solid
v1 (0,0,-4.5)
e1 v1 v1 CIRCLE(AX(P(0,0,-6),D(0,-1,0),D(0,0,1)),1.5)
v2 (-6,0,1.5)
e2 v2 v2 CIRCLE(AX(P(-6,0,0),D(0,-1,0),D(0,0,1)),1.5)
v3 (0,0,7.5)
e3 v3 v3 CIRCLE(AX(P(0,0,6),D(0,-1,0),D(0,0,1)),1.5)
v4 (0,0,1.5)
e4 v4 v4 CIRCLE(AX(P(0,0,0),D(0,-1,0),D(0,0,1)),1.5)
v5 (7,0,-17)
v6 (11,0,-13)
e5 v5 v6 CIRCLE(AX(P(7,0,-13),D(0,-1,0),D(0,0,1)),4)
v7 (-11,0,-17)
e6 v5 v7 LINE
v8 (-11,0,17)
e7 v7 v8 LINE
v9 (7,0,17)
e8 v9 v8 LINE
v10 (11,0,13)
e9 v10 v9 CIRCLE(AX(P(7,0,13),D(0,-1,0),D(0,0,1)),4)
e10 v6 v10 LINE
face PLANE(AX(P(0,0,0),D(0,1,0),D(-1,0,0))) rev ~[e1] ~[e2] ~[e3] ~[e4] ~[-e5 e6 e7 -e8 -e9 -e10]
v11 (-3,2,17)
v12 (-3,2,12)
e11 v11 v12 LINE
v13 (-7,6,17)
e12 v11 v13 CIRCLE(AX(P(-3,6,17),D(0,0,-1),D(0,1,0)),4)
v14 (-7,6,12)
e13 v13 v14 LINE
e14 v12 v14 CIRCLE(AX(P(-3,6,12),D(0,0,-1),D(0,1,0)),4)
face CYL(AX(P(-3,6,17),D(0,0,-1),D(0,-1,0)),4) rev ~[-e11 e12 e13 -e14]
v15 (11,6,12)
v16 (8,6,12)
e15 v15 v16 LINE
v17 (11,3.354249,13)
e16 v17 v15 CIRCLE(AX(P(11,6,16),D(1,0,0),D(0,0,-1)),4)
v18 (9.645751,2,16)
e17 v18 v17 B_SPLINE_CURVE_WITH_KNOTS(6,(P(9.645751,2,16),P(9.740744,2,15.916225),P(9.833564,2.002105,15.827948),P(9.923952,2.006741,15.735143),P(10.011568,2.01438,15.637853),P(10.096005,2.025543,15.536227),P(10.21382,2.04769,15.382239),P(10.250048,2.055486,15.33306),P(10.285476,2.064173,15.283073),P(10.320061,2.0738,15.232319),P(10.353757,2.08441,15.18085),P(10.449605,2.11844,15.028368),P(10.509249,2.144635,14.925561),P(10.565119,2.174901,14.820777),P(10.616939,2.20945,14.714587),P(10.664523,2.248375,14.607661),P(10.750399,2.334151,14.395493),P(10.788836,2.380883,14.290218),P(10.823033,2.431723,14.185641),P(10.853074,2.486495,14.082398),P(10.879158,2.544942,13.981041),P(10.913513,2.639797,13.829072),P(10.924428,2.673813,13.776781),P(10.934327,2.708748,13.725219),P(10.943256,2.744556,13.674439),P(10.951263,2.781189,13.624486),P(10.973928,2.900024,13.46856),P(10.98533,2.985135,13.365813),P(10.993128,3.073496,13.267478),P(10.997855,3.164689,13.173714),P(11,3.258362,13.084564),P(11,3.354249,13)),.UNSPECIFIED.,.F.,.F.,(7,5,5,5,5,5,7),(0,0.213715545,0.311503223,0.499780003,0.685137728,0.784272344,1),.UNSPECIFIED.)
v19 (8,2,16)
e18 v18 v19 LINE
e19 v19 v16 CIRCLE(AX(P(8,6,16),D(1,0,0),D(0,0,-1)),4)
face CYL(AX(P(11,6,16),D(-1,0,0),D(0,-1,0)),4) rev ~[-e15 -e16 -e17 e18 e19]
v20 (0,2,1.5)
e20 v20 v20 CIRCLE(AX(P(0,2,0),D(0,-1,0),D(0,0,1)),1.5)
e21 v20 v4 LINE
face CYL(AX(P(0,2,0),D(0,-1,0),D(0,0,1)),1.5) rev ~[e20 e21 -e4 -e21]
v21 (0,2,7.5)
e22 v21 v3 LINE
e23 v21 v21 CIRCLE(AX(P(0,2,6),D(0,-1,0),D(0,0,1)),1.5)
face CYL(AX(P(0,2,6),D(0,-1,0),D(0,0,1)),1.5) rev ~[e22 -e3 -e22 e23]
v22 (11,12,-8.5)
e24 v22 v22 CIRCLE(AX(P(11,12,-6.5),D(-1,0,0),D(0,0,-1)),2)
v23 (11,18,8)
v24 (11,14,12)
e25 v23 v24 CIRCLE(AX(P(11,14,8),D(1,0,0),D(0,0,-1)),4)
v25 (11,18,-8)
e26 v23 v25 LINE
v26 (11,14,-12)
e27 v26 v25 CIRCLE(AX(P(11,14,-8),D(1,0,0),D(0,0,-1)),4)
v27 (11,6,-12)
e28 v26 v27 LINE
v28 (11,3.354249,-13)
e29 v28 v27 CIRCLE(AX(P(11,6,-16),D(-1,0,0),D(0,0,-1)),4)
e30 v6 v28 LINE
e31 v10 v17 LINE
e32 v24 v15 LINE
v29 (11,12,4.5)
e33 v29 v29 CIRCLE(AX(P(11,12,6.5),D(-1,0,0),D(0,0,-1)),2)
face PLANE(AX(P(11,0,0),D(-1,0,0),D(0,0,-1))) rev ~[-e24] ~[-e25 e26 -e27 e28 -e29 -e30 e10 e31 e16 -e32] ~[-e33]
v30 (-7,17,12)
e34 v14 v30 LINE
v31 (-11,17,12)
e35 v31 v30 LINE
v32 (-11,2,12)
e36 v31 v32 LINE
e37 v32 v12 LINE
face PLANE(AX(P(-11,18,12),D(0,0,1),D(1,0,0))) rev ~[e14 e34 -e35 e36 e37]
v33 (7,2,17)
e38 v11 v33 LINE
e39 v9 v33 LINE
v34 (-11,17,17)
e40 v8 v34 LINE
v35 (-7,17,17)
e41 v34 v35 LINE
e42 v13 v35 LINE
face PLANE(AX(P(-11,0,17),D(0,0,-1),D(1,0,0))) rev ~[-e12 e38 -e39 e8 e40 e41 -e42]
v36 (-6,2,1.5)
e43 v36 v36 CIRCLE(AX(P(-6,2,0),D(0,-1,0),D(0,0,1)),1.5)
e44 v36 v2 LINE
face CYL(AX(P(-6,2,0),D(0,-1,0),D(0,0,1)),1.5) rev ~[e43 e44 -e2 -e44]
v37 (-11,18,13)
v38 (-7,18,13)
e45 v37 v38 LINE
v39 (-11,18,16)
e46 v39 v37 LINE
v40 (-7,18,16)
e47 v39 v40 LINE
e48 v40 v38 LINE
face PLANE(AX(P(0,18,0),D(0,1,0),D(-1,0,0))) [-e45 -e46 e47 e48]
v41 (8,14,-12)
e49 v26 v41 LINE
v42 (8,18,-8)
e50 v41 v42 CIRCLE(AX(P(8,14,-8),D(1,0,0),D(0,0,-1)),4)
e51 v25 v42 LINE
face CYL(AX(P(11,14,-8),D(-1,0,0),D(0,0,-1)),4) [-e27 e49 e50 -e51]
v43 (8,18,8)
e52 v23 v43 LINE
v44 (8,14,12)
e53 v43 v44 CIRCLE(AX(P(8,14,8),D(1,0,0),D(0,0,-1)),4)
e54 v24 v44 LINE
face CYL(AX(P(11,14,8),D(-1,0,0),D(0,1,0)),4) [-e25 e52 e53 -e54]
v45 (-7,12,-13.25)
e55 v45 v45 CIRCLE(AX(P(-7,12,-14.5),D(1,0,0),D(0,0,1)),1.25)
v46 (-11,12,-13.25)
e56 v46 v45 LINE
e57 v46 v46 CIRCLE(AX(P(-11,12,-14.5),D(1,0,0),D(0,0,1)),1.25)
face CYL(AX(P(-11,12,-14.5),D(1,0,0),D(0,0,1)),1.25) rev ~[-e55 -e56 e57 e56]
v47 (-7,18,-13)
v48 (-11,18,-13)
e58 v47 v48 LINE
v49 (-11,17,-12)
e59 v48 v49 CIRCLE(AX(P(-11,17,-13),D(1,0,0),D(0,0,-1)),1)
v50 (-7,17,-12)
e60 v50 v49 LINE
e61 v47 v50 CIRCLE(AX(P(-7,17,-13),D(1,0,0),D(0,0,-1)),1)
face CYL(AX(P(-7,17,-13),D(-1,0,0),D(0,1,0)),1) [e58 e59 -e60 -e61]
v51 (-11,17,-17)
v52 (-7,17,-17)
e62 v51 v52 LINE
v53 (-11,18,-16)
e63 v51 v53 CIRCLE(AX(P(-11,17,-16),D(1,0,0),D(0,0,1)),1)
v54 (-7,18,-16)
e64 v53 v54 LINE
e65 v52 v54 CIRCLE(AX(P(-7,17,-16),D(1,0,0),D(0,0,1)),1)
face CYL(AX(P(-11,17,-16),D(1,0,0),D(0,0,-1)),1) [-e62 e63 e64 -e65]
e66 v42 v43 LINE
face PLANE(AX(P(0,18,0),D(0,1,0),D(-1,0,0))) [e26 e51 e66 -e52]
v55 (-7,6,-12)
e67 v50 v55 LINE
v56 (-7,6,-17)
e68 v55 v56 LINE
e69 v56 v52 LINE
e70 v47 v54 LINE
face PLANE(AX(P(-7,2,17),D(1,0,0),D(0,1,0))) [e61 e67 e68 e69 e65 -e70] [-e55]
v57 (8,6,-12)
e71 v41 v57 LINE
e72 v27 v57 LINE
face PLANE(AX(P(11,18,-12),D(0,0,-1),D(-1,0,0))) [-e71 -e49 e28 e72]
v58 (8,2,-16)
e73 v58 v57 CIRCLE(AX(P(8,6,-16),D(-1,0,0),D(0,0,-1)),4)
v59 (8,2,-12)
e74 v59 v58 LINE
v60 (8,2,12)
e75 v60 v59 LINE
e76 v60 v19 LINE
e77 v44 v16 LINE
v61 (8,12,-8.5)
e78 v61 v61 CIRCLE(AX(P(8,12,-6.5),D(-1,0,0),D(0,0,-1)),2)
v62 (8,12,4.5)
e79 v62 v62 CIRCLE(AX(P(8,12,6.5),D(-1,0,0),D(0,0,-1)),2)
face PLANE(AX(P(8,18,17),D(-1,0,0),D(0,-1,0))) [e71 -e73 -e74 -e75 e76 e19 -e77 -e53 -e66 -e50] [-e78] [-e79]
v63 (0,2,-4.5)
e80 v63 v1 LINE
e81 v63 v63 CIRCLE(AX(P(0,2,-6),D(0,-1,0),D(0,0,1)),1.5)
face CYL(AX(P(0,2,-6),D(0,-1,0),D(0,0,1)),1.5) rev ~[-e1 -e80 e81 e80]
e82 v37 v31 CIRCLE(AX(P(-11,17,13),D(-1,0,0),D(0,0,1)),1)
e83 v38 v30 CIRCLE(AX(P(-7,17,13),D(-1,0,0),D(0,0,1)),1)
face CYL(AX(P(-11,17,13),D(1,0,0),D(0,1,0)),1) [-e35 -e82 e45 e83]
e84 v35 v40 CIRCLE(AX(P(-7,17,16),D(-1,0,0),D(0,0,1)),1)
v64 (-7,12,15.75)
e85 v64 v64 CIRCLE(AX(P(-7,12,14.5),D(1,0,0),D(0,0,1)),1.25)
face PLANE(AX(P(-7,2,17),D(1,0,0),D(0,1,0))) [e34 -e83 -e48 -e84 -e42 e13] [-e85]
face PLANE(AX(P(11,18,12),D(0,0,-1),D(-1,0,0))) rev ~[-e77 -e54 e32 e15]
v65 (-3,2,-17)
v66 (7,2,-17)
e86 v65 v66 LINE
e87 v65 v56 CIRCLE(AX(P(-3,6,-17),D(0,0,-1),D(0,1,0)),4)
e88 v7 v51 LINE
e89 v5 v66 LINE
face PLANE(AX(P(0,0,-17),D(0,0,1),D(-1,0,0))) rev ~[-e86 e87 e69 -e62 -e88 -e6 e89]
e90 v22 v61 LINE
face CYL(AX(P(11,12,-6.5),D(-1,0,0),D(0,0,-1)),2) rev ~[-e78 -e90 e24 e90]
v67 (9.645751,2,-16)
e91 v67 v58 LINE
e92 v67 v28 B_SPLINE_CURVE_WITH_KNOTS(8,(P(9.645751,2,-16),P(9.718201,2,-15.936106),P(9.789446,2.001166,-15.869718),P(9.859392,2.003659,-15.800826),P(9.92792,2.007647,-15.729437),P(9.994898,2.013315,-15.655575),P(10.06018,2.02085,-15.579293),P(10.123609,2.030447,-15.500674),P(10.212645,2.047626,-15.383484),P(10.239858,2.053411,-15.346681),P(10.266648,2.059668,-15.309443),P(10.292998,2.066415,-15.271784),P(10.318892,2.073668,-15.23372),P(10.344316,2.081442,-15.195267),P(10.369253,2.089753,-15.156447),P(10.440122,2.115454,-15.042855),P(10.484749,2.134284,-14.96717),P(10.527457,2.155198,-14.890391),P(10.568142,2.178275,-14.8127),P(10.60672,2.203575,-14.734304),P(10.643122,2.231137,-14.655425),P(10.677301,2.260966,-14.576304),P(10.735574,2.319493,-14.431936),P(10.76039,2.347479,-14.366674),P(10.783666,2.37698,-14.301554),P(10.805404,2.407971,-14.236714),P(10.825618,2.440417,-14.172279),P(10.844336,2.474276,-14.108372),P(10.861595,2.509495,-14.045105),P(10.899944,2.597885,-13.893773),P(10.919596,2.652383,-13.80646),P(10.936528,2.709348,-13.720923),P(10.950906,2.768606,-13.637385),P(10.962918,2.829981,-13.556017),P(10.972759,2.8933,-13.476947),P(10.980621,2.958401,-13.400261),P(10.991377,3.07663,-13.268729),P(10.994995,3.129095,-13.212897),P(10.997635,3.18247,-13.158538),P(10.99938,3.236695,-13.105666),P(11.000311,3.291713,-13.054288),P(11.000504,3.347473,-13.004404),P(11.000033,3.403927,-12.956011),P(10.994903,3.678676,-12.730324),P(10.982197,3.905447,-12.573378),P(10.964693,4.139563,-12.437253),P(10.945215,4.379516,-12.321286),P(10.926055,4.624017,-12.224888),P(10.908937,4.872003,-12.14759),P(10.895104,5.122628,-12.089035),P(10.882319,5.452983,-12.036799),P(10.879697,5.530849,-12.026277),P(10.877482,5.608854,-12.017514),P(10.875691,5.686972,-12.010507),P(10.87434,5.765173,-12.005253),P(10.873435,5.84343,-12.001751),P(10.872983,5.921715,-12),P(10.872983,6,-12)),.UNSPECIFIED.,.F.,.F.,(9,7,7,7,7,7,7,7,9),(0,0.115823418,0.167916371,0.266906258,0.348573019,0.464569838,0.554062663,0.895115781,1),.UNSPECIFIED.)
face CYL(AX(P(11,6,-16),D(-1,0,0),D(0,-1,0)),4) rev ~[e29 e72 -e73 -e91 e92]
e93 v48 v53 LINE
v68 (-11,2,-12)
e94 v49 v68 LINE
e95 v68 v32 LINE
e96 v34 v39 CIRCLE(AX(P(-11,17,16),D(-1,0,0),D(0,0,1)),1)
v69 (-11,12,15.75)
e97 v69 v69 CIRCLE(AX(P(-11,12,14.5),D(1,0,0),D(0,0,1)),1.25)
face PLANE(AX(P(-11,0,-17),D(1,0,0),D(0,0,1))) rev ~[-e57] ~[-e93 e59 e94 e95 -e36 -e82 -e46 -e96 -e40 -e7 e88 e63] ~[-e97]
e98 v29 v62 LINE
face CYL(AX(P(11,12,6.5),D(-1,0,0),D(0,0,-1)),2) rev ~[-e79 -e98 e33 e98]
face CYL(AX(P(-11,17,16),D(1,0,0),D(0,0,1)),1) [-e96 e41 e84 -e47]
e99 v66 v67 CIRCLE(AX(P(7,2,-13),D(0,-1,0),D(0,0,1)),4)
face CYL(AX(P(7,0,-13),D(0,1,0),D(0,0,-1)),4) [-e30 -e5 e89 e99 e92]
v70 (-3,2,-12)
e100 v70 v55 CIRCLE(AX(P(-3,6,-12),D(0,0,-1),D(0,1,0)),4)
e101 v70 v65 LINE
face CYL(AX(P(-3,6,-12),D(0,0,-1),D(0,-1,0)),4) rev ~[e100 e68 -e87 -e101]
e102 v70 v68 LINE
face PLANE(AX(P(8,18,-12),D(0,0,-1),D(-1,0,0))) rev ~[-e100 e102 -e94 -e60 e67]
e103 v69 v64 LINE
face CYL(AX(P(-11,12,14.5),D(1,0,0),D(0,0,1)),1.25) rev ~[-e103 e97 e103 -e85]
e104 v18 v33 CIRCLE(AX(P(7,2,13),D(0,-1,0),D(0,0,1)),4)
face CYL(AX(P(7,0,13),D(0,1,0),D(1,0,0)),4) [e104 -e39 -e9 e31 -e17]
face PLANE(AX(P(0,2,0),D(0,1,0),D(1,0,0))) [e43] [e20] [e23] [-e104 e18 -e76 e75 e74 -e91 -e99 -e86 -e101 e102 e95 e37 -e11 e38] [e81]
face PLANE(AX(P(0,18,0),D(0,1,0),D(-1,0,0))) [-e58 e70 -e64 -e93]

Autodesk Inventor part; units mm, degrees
ref_plane "YZ Plane" through (0, 0, 0) normal (1, 0, 0) x (0, 1, 0)
ref_plane "XZ Plane" through (0, 0, 0) normal (0, 1, 0) x (-1, 0, 0)
ref_plane "XY Plane" through (0, 0, 0) normal (0, 0, 1) x (1, 0, 0)
sketch "Sketch1" plane through (0, 0, 0) normal (0, 1, 0) x (-1, 0, 0)
  line L0 (15.4, 0) -> (-15.4, 0) projected
  line L1 (0, -23.8) -> (0, 23.8) projected
  line L2 (11, 17) -> (-11, 17)
  line L3 (-11, 17) -> (-11, -17)
  line L4 (-11, -17) -> (11, -17)
  line L5 (11, -17) -> (11, 17)
  point P0 (0, 0)
  dimension "d0" = 22
  dimension "d1" = 34
extrude "Extrusion1" add sketch "Sketch1" along normal blind 18
sketch "Sketch2" plane through (0, 18, 0) normal (0, 1, 0) x (1, 0, 0)
  line L0 (-11, -12) -> (8, -12)
  line L1 (8, -12) -> (8, 12)
  line L2 (8, 12) -> (-11, 12)
  line L3 (-11, 12) -> (-11, -12)
  line L4 (-11, -17) -> (11, -17) projected
  line L5 (11, -17) -> (11, 17) projected
  line L6 (11, 17) -> (-11, 17) projected
  line L7 (-11, 17) -> (-11, -17) projected
  line L8 (-15.4, 0) -> (15.4, 0) projected
  point P0 (0, 0)
  dimension "d5" = 24
  dimension "d6" = 3
extrude "Extrusion2" cut sketch "Sketch2" against normal blind 16 contours L3 L8 L1 L0 | L3 L2 L1 L8
sketch "Sketch3" plane through (-11, 0, 17) normal (0, 0, 1) x (1, 0, 0)
  line L0 (4, 18) -> (19, 18)
  line L1 (19, 18) -> (19, 2)
  line L2 (19, 2) -> (4, 2)
  line L3 (4, 2) -> (4, 18)
  line L4 (0, 18) -> (22, 18) projected
  line L5 (0, 0) -> (0, 18) projected
  line L6 (22, 0) -> (22, 18) projected
  line L7 (0, 0) -> (22, 0) projected
  point P0 (11, 0)
  dimension "d9" = 4
  dimension "d10" = 3
  dimension "d11" = 2
extrude "Extrusion3" cut sketch "Sketch3" against normal through all contours L0 L1 L2 L3
sketch "Sketch6" plane through (0, 2, 0) normal (0, 1, 0) x (1, 0, 0)
  line L0 (-11, 12) -> (-7, 12) projected
  line L1 (-11, -12) -> (-11, 12) projected
  line L2 (-7, -12) -> (-11, -12) projected
  line L3 (-7, -17) -> (-7, -12) projected
  line L4 (8, -17) -> (-7, -17) projected
  line L5 (-7, 17) -> (8, 17) projected
  line L6 (-7, 12) -> (-7, 17) projected
  line L7 (-15.4, 0) -> (15.4, 0) projected
  line L8 (0, 23.8) -> (0, -23.8) projected
  line L9 (8, -17) -> (8, 17) projected
  point P0 (0, 0)
  point P1 (0, 0)
  point P2 (0, 6)
  point P3 (0, -6)
  point P4 (-6, 0)
  dimension "d15" = 6
  dimension "d16" = 6
  dimension "d18" = 6
hole "Hole1" at (0, 2, -6) at (0, 2, 0) at (0, 2, 6) at (-6, 2, 0) direction (0, -1, 0) diameter 3 end through all
sketch "Sketch8" plane through (11, 0, 17) normal (1, 0, 0) x (0, 0, -1)
  line L0 (0, 0) -> (34, 0) projected
  line L1 (34, 0) -> (34, 18) projected
  line L2 (0, 18) -> (34, 18) projected
  line L3 (0, 0) -> (0, 18) projected
  line L4 (29, 2) -> (29, 18) projected
  line L5 (5, 18) -> (5, 2) projected
  line L6 (29, 2) -> (5, 2) projected
  point P0 (17, 0)
  point P1 (0, 2)
  point P2 (34, 2)
  point P3 (23.5, 12)
  point P4 (10.5, 12)
  dimension "d28" = 5.5
  dimension "d29" = 5.5
  dimension "d30" = 6
  dimension "d31" = 6
hole "Hole2" at (11, 12, -6.5) at (11, 12, 6.5) direction (-1, 0, 0) diameter 4 end through all
sketch "Sketch9" plane through (-11, 0, -17) normal (-1, 0, 0) x (0, 0, 1)
  line L0 (29, 18) -> (29, 2) projected
  line L1 (29, 2) -> (5, 2) projected
  line L2 (5, 2) -> (5, 18) projected
  line L3 (0, 18) -> (5, 18) projected
  line L4 (0, 0) -> (0, 18) projected
  line L5 (0, 0) -> (34, 0) projected
  line L6 (34, 0) -> (34, 18) projected
  line L7 (29, 18) -> (34, 18) projected
  point P0 (17, 0)
  point P1 (2.5, 12)
  point P2 (31.5, 12)
  dimension "d39" = 6
  dimension "d40" = 6
  dimension "d41" = 2.5
  dimension "d42" = 2.5
hole "Hole3" at (-11, 12, -14.5) at (-11, 12, 14.5) direction (1, 0, 0) diameter 2.5 depth 19
fillet "Fillet2" radius 1 4 edges at (-9, 18, 17) (-9, 18, -17) (-9, 18, -12) (-9, 18, 12)
fillet "Fillet4" radius 4 2 edges at (-7, 2, -14.5) (-7, 2, 14.5)
sketch "Sketch12" plane through (0, 18, 0) normal (0, 1, 0) x (1, 0, 0)
  line L0 (8, 17) -> (8, -17) projected
  line L1 (8, -17) -> (11, -17) projected
  line L2 (11, -17) -> (11, 17) projected
  line L3 (11, 17) -> (8, 17) projected
  line L4 (8, -17) -> (11, -17)
  line L5 (11, -17) -> (11, -12)
  line L6 (11, -12) -> (8, -12)
  line L7 (8, -12) -> (8, -17)
  line L8 (8, 17) -> (11, 17)
  line L9 (11, 17) -> (11, 12)
  line L10 (11, 12) -> (8, 12)
  line L11 (8, 12) -> (8, 17)
  line L12 (-11, 12) -> (-7, 12) projected
  line L13 (-7, -12) -> (-11, -12) projected
  point P0 (0, 0)
extrude "Extrusion5" cut sketch "Sketch12" against normal blind 16 contours L3 L2 L10 L0 | L6 L2 L1 L0
fillet "Fillet5" radius 4 4 edges at (9.5, 18, 12) (9.5, 18, -12) (11, 1, 17) (11, 1, -17)
fillet "Fillet6" radius 4 2 edges at (9.5, 2, -12) (9.5, 2, 12)
properties part number "bracket"
